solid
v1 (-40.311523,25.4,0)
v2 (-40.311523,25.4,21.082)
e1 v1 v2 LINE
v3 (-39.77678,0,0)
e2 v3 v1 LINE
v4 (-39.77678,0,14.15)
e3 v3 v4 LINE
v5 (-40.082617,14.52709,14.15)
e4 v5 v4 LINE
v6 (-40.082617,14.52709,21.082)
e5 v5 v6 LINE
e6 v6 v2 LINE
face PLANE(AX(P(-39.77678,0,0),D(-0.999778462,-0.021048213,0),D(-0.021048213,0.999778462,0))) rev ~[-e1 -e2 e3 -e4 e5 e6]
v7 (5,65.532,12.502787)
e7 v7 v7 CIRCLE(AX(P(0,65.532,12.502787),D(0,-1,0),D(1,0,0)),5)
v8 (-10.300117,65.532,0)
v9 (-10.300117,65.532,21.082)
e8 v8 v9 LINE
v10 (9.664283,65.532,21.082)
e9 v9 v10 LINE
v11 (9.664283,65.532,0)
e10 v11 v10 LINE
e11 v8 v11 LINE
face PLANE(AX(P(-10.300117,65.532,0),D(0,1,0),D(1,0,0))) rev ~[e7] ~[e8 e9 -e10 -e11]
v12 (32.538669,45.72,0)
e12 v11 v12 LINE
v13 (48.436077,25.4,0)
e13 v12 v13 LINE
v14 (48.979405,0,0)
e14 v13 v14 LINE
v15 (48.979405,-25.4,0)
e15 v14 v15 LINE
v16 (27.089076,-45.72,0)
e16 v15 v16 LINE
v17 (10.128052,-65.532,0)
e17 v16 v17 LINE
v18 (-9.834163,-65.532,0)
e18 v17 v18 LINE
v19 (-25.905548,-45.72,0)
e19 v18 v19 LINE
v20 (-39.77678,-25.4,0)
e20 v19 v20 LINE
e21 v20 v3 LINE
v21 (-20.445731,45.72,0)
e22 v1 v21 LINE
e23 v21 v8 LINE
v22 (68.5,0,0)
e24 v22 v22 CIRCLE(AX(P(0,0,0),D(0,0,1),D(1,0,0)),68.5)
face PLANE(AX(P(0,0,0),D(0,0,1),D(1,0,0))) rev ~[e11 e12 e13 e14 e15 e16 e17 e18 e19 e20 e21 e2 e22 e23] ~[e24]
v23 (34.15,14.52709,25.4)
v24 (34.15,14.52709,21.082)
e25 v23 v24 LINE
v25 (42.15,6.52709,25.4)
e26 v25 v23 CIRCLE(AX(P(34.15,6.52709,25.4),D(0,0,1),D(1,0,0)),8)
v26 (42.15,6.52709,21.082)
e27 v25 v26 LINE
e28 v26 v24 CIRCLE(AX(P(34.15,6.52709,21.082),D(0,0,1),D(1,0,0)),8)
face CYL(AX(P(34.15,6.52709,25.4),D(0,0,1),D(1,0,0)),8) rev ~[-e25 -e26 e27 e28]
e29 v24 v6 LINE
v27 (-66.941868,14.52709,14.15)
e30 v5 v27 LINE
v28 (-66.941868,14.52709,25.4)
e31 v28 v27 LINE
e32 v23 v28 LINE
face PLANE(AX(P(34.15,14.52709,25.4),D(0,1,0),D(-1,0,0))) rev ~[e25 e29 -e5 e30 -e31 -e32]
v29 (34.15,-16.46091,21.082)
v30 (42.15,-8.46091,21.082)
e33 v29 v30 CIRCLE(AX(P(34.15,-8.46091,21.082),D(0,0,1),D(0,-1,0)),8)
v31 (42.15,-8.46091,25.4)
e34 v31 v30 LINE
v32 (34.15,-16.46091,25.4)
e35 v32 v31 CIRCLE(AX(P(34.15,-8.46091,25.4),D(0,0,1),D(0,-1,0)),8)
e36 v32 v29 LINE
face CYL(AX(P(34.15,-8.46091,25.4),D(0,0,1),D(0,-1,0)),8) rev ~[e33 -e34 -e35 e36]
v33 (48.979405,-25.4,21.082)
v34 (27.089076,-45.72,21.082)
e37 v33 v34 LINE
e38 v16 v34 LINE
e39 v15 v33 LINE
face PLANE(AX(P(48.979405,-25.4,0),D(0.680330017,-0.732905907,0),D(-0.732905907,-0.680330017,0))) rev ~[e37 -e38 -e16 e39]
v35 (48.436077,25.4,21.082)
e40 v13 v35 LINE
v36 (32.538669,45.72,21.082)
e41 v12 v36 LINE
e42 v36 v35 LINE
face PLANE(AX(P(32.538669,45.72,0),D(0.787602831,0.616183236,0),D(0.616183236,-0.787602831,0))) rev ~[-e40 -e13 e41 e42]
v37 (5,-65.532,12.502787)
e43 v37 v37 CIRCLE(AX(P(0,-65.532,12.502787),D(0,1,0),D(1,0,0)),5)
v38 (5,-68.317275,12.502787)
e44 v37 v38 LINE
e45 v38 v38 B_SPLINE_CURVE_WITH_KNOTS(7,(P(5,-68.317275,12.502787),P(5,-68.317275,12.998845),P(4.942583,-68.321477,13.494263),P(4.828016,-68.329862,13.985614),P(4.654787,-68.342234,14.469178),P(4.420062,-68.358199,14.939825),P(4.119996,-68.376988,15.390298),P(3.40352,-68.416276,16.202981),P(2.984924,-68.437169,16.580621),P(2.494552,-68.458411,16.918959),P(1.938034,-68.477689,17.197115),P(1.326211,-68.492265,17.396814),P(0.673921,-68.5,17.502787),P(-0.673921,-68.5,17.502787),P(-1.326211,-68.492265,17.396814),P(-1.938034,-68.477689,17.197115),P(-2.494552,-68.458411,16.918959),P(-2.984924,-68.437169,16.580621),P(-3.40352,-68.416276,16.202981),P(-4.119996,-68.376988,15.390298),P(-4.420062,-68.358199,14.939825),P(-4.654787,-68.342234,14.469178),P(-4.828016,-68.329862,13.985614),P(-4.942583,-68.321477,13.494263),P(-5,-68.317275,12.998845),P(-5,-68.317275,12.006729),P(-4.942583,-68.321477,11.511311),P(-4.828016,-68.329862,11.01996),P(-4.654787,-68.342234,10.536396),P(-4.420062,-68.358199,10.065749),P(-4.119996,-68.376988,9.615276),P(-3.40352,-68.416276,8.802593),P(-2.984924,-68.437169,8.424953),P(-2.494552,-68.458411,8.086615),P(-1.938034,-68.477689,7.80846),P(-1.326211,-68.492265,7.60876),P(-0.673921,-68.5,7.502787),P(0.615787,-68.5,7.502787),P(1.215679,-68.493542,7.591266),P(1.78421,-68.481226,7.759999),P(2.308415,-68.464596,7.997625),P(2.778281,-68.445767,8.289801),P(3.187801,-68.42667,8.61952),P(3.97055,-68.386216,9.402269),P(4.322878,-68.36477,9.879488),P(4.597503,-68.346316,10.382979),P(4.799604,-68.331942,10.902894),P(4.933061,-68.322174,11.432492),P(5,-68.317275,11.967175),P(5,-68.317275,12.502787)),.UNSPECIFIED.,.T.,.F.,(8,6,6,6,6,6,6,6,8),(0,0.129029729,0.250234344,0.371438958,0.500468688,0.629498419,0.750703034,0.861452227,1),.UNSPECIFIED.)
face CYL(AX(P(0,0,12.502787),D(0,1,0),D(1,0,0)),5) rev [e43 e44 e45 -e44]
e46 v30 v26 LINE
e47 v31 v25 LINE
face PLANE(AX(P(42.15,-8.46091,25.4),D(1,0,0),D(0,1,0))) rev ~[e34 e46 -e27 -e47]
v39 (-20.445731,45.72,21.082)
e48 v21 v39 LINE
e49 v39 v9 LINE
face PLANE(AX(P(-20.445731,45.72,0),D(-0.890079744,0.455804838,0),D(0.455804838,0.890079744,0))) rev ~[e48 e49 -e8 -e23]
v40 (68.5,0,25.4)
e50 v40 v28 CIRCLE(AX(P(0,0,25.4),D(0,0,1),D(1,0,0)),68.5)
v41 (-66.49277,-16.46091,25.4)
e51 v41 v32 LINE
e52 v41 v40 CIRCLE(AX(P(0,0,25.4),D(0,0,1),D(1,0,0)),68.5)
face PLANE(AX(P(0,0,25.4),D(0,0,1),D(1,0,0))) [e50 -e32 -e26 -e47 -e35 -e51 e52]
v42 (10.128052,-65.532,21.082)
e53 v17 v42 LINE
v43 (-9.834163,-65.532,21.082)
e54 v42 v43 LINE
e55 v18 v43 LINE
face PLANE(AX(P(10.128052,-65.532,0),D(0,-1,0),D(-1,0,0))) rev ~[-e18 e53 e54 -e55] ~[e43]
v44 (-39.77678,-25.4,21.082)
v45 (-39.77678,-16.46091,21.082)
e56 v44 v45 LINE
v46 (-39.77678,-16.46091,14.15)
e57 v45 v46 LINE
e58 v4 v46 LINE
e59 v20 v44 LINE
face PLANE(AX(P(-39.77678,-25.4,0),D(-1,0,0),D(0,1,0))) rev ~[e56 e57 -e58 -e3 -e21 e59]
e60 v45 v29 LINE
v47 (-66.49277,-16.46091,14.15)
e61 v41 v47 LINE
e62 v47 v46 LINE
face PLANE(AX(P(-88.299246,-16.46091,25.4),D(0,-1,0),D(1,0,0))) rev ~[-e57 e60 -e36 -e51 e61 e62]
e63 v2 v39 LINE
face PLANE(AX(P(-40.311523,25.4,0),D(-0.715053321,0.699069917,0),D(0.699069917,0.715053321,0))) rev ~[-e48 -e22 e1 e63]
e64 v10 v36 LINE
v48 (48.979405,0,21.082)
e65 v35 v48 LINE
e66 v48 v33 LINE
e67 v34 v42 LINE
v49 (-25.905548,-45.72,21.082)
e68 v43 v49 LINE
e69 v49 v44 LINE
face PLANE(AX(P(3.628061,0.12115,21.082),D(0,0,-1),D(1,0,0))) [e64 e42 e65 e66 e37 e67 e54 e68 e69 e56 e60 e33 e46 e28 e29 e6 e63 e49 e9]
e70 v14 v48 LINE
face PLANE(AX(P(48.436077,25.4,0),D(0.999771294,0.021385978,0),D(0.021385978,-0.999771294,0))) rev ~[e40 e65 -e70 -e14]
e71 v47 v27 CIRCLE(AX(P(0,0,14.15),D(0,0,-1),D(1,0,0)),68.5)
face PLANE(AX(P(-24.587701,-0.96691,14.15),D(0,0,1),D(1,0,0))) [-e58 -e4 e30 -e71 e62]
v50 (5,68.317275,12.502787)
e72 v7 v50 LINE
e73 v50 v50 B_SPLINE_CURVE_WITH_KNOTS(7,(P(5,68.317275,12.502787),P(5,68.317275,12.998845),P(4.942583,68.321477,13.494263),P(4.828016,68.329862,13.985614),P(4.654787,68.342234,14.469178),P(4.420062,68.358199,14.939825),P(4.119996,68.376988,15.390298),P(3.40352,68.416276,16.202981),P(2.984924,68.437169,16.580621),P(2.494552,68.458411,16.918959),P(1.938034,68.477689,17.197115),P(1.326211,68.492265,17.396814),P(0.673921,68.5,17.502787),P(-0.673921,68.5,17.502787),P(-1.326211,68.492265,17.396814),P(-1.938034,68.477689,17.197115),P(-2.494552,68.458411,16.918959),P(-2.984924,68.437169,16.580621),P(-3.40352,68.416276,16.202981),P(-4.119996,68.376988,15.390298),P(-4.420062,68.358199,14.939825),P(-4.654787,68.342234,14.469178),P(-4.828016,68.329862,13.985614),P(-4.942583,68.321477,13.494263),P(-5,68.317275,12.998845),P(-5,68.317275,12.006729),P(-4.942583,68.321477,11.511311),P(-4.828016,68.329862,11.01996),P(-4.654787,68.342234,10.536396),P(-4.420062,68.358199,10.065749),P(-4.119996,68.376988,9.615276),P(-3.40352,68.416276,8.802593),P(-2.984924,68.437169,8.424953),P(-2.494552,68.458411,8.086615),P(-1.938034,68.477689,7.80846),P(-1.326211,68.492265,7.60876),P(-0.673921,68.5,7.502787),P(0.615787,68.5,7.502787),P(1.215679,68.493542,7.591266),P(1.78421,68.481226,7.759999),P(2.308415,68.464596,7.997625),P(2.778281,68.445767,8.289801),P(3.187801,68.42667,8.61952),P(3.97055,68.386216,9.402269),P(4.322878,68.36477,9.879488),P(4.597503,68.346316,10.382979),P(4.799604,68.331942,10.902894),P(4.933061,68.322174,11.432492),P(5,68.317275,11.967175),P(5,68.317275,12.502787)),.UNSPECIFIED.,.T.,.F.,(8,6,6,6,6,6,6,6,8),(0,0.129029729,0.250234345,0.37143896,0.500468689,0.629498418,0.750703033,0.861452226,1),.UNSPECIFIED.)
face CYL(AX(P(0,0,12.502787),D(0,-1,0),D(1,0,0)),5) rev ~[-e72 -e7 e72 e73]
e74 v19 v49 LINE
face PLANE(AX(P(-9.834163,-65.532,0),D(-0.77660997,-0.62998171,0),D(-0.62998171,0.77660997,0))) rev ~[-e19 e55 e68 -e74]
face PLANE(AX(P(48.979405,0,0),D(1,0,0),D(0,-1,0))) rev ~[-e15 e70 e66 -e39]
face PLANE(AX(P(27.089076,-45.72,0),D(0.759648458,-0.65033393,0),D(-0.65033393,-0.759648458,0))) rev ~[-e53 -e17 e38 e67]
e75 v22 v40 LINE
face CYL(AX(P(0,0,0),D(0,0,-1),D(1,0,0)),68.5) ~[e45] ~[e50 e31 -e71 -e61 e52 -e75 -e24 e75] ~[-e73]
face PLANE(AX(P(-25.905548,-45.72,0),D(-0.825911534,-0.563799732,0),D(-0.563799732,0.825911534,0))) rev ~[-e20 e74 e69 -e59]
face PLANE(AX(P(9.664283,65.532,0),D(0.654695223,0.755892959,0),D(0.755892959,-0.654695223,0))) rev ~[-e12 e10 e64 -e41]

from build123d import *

# Parameters (mm, degrees)
F0_R          = 68.5
F1_DEPTH      = 25.4
F3_DEPTH      = 11.25
F6_DEPTH      = 21.082
F4_R          = 5
F7_DEPTH      = 68.501
F7_DEPTH_BACK = 68.501


with BuildPart() as f1:
    # F0 (on Top) → F1 (new body)
    with BuildSketch(Plane.XY):
        Circle(F0_R)
    extrude(amount=F1_DEPTH)

    # F2 (on face) → F3 (cut)
    with BuildSketch(Plane.XY.offset(25.4)):
        with BuildLine():
            Line((34.15, 14.5270901566), (-88.2992463768, 14.5270901566))
            Line((-88.2992463768, 14.5270901566), (-88.2992463768, -16.4609098434))
            Line((-88.2992463768, -16.4609098434), (34.15, -16.4609098434))
            ThreePointArc((34.15, -16.4609098434), (39.8068542495, -14.1177640929), (42.15, -8.4609098434))
            Line((42.15, -8.4609098434), (42.15, 6.5270901566))
            ThreePointArc((42.15, 6.5270901566), (39.8068542495, 12.183944406), (34.15, 14.5270901566))
        make_face()
    extrude(amount=-F3_DEPTH, mode=Mode.SUBTRACT)

    # F5 (on face) → F6 (cut)
    with BuildSketch(Plane(origin=(0, 0, 0), x_dir=(1, 0, 0), z_dir=(0, 0, -1))):
        Polygon((10.1280519739, 65.532), (-9.8341628909, 65.532), (-25.9055476636, 45.72), (-39.7767797112, 25.4), (-39.7767797112, 0), (-40.3115227818, -25.4), (-20.4457305372, -45.72), (-10.3001166135, -65.532), (9.6642833865, -65.532), (32.5386694628, -45.72), (48.4360772182, -25.4), (48.9794053137, 0), (48.9794053137, 25.4), (27.0890761167, 45.72), align=None)
    extrude(amount=-F6_DEPTH, mode=Mode.SUBTRACT)

    # F4 (on Front) → F7 (cut, two sides)
    with BuildSketch(Plane.XZ) as f7_sk:
        with Locations((0, 12.5027870712)):
            Circle(F4_R)
    extrude(amount=-F7_DEPTH, mode=Mode.SUBTRACT)
    extrude(f7_sk.sketch, amount=F7_DEPTH_BACK, mode=Mode.SUBTRACT)


solid = f1.part
